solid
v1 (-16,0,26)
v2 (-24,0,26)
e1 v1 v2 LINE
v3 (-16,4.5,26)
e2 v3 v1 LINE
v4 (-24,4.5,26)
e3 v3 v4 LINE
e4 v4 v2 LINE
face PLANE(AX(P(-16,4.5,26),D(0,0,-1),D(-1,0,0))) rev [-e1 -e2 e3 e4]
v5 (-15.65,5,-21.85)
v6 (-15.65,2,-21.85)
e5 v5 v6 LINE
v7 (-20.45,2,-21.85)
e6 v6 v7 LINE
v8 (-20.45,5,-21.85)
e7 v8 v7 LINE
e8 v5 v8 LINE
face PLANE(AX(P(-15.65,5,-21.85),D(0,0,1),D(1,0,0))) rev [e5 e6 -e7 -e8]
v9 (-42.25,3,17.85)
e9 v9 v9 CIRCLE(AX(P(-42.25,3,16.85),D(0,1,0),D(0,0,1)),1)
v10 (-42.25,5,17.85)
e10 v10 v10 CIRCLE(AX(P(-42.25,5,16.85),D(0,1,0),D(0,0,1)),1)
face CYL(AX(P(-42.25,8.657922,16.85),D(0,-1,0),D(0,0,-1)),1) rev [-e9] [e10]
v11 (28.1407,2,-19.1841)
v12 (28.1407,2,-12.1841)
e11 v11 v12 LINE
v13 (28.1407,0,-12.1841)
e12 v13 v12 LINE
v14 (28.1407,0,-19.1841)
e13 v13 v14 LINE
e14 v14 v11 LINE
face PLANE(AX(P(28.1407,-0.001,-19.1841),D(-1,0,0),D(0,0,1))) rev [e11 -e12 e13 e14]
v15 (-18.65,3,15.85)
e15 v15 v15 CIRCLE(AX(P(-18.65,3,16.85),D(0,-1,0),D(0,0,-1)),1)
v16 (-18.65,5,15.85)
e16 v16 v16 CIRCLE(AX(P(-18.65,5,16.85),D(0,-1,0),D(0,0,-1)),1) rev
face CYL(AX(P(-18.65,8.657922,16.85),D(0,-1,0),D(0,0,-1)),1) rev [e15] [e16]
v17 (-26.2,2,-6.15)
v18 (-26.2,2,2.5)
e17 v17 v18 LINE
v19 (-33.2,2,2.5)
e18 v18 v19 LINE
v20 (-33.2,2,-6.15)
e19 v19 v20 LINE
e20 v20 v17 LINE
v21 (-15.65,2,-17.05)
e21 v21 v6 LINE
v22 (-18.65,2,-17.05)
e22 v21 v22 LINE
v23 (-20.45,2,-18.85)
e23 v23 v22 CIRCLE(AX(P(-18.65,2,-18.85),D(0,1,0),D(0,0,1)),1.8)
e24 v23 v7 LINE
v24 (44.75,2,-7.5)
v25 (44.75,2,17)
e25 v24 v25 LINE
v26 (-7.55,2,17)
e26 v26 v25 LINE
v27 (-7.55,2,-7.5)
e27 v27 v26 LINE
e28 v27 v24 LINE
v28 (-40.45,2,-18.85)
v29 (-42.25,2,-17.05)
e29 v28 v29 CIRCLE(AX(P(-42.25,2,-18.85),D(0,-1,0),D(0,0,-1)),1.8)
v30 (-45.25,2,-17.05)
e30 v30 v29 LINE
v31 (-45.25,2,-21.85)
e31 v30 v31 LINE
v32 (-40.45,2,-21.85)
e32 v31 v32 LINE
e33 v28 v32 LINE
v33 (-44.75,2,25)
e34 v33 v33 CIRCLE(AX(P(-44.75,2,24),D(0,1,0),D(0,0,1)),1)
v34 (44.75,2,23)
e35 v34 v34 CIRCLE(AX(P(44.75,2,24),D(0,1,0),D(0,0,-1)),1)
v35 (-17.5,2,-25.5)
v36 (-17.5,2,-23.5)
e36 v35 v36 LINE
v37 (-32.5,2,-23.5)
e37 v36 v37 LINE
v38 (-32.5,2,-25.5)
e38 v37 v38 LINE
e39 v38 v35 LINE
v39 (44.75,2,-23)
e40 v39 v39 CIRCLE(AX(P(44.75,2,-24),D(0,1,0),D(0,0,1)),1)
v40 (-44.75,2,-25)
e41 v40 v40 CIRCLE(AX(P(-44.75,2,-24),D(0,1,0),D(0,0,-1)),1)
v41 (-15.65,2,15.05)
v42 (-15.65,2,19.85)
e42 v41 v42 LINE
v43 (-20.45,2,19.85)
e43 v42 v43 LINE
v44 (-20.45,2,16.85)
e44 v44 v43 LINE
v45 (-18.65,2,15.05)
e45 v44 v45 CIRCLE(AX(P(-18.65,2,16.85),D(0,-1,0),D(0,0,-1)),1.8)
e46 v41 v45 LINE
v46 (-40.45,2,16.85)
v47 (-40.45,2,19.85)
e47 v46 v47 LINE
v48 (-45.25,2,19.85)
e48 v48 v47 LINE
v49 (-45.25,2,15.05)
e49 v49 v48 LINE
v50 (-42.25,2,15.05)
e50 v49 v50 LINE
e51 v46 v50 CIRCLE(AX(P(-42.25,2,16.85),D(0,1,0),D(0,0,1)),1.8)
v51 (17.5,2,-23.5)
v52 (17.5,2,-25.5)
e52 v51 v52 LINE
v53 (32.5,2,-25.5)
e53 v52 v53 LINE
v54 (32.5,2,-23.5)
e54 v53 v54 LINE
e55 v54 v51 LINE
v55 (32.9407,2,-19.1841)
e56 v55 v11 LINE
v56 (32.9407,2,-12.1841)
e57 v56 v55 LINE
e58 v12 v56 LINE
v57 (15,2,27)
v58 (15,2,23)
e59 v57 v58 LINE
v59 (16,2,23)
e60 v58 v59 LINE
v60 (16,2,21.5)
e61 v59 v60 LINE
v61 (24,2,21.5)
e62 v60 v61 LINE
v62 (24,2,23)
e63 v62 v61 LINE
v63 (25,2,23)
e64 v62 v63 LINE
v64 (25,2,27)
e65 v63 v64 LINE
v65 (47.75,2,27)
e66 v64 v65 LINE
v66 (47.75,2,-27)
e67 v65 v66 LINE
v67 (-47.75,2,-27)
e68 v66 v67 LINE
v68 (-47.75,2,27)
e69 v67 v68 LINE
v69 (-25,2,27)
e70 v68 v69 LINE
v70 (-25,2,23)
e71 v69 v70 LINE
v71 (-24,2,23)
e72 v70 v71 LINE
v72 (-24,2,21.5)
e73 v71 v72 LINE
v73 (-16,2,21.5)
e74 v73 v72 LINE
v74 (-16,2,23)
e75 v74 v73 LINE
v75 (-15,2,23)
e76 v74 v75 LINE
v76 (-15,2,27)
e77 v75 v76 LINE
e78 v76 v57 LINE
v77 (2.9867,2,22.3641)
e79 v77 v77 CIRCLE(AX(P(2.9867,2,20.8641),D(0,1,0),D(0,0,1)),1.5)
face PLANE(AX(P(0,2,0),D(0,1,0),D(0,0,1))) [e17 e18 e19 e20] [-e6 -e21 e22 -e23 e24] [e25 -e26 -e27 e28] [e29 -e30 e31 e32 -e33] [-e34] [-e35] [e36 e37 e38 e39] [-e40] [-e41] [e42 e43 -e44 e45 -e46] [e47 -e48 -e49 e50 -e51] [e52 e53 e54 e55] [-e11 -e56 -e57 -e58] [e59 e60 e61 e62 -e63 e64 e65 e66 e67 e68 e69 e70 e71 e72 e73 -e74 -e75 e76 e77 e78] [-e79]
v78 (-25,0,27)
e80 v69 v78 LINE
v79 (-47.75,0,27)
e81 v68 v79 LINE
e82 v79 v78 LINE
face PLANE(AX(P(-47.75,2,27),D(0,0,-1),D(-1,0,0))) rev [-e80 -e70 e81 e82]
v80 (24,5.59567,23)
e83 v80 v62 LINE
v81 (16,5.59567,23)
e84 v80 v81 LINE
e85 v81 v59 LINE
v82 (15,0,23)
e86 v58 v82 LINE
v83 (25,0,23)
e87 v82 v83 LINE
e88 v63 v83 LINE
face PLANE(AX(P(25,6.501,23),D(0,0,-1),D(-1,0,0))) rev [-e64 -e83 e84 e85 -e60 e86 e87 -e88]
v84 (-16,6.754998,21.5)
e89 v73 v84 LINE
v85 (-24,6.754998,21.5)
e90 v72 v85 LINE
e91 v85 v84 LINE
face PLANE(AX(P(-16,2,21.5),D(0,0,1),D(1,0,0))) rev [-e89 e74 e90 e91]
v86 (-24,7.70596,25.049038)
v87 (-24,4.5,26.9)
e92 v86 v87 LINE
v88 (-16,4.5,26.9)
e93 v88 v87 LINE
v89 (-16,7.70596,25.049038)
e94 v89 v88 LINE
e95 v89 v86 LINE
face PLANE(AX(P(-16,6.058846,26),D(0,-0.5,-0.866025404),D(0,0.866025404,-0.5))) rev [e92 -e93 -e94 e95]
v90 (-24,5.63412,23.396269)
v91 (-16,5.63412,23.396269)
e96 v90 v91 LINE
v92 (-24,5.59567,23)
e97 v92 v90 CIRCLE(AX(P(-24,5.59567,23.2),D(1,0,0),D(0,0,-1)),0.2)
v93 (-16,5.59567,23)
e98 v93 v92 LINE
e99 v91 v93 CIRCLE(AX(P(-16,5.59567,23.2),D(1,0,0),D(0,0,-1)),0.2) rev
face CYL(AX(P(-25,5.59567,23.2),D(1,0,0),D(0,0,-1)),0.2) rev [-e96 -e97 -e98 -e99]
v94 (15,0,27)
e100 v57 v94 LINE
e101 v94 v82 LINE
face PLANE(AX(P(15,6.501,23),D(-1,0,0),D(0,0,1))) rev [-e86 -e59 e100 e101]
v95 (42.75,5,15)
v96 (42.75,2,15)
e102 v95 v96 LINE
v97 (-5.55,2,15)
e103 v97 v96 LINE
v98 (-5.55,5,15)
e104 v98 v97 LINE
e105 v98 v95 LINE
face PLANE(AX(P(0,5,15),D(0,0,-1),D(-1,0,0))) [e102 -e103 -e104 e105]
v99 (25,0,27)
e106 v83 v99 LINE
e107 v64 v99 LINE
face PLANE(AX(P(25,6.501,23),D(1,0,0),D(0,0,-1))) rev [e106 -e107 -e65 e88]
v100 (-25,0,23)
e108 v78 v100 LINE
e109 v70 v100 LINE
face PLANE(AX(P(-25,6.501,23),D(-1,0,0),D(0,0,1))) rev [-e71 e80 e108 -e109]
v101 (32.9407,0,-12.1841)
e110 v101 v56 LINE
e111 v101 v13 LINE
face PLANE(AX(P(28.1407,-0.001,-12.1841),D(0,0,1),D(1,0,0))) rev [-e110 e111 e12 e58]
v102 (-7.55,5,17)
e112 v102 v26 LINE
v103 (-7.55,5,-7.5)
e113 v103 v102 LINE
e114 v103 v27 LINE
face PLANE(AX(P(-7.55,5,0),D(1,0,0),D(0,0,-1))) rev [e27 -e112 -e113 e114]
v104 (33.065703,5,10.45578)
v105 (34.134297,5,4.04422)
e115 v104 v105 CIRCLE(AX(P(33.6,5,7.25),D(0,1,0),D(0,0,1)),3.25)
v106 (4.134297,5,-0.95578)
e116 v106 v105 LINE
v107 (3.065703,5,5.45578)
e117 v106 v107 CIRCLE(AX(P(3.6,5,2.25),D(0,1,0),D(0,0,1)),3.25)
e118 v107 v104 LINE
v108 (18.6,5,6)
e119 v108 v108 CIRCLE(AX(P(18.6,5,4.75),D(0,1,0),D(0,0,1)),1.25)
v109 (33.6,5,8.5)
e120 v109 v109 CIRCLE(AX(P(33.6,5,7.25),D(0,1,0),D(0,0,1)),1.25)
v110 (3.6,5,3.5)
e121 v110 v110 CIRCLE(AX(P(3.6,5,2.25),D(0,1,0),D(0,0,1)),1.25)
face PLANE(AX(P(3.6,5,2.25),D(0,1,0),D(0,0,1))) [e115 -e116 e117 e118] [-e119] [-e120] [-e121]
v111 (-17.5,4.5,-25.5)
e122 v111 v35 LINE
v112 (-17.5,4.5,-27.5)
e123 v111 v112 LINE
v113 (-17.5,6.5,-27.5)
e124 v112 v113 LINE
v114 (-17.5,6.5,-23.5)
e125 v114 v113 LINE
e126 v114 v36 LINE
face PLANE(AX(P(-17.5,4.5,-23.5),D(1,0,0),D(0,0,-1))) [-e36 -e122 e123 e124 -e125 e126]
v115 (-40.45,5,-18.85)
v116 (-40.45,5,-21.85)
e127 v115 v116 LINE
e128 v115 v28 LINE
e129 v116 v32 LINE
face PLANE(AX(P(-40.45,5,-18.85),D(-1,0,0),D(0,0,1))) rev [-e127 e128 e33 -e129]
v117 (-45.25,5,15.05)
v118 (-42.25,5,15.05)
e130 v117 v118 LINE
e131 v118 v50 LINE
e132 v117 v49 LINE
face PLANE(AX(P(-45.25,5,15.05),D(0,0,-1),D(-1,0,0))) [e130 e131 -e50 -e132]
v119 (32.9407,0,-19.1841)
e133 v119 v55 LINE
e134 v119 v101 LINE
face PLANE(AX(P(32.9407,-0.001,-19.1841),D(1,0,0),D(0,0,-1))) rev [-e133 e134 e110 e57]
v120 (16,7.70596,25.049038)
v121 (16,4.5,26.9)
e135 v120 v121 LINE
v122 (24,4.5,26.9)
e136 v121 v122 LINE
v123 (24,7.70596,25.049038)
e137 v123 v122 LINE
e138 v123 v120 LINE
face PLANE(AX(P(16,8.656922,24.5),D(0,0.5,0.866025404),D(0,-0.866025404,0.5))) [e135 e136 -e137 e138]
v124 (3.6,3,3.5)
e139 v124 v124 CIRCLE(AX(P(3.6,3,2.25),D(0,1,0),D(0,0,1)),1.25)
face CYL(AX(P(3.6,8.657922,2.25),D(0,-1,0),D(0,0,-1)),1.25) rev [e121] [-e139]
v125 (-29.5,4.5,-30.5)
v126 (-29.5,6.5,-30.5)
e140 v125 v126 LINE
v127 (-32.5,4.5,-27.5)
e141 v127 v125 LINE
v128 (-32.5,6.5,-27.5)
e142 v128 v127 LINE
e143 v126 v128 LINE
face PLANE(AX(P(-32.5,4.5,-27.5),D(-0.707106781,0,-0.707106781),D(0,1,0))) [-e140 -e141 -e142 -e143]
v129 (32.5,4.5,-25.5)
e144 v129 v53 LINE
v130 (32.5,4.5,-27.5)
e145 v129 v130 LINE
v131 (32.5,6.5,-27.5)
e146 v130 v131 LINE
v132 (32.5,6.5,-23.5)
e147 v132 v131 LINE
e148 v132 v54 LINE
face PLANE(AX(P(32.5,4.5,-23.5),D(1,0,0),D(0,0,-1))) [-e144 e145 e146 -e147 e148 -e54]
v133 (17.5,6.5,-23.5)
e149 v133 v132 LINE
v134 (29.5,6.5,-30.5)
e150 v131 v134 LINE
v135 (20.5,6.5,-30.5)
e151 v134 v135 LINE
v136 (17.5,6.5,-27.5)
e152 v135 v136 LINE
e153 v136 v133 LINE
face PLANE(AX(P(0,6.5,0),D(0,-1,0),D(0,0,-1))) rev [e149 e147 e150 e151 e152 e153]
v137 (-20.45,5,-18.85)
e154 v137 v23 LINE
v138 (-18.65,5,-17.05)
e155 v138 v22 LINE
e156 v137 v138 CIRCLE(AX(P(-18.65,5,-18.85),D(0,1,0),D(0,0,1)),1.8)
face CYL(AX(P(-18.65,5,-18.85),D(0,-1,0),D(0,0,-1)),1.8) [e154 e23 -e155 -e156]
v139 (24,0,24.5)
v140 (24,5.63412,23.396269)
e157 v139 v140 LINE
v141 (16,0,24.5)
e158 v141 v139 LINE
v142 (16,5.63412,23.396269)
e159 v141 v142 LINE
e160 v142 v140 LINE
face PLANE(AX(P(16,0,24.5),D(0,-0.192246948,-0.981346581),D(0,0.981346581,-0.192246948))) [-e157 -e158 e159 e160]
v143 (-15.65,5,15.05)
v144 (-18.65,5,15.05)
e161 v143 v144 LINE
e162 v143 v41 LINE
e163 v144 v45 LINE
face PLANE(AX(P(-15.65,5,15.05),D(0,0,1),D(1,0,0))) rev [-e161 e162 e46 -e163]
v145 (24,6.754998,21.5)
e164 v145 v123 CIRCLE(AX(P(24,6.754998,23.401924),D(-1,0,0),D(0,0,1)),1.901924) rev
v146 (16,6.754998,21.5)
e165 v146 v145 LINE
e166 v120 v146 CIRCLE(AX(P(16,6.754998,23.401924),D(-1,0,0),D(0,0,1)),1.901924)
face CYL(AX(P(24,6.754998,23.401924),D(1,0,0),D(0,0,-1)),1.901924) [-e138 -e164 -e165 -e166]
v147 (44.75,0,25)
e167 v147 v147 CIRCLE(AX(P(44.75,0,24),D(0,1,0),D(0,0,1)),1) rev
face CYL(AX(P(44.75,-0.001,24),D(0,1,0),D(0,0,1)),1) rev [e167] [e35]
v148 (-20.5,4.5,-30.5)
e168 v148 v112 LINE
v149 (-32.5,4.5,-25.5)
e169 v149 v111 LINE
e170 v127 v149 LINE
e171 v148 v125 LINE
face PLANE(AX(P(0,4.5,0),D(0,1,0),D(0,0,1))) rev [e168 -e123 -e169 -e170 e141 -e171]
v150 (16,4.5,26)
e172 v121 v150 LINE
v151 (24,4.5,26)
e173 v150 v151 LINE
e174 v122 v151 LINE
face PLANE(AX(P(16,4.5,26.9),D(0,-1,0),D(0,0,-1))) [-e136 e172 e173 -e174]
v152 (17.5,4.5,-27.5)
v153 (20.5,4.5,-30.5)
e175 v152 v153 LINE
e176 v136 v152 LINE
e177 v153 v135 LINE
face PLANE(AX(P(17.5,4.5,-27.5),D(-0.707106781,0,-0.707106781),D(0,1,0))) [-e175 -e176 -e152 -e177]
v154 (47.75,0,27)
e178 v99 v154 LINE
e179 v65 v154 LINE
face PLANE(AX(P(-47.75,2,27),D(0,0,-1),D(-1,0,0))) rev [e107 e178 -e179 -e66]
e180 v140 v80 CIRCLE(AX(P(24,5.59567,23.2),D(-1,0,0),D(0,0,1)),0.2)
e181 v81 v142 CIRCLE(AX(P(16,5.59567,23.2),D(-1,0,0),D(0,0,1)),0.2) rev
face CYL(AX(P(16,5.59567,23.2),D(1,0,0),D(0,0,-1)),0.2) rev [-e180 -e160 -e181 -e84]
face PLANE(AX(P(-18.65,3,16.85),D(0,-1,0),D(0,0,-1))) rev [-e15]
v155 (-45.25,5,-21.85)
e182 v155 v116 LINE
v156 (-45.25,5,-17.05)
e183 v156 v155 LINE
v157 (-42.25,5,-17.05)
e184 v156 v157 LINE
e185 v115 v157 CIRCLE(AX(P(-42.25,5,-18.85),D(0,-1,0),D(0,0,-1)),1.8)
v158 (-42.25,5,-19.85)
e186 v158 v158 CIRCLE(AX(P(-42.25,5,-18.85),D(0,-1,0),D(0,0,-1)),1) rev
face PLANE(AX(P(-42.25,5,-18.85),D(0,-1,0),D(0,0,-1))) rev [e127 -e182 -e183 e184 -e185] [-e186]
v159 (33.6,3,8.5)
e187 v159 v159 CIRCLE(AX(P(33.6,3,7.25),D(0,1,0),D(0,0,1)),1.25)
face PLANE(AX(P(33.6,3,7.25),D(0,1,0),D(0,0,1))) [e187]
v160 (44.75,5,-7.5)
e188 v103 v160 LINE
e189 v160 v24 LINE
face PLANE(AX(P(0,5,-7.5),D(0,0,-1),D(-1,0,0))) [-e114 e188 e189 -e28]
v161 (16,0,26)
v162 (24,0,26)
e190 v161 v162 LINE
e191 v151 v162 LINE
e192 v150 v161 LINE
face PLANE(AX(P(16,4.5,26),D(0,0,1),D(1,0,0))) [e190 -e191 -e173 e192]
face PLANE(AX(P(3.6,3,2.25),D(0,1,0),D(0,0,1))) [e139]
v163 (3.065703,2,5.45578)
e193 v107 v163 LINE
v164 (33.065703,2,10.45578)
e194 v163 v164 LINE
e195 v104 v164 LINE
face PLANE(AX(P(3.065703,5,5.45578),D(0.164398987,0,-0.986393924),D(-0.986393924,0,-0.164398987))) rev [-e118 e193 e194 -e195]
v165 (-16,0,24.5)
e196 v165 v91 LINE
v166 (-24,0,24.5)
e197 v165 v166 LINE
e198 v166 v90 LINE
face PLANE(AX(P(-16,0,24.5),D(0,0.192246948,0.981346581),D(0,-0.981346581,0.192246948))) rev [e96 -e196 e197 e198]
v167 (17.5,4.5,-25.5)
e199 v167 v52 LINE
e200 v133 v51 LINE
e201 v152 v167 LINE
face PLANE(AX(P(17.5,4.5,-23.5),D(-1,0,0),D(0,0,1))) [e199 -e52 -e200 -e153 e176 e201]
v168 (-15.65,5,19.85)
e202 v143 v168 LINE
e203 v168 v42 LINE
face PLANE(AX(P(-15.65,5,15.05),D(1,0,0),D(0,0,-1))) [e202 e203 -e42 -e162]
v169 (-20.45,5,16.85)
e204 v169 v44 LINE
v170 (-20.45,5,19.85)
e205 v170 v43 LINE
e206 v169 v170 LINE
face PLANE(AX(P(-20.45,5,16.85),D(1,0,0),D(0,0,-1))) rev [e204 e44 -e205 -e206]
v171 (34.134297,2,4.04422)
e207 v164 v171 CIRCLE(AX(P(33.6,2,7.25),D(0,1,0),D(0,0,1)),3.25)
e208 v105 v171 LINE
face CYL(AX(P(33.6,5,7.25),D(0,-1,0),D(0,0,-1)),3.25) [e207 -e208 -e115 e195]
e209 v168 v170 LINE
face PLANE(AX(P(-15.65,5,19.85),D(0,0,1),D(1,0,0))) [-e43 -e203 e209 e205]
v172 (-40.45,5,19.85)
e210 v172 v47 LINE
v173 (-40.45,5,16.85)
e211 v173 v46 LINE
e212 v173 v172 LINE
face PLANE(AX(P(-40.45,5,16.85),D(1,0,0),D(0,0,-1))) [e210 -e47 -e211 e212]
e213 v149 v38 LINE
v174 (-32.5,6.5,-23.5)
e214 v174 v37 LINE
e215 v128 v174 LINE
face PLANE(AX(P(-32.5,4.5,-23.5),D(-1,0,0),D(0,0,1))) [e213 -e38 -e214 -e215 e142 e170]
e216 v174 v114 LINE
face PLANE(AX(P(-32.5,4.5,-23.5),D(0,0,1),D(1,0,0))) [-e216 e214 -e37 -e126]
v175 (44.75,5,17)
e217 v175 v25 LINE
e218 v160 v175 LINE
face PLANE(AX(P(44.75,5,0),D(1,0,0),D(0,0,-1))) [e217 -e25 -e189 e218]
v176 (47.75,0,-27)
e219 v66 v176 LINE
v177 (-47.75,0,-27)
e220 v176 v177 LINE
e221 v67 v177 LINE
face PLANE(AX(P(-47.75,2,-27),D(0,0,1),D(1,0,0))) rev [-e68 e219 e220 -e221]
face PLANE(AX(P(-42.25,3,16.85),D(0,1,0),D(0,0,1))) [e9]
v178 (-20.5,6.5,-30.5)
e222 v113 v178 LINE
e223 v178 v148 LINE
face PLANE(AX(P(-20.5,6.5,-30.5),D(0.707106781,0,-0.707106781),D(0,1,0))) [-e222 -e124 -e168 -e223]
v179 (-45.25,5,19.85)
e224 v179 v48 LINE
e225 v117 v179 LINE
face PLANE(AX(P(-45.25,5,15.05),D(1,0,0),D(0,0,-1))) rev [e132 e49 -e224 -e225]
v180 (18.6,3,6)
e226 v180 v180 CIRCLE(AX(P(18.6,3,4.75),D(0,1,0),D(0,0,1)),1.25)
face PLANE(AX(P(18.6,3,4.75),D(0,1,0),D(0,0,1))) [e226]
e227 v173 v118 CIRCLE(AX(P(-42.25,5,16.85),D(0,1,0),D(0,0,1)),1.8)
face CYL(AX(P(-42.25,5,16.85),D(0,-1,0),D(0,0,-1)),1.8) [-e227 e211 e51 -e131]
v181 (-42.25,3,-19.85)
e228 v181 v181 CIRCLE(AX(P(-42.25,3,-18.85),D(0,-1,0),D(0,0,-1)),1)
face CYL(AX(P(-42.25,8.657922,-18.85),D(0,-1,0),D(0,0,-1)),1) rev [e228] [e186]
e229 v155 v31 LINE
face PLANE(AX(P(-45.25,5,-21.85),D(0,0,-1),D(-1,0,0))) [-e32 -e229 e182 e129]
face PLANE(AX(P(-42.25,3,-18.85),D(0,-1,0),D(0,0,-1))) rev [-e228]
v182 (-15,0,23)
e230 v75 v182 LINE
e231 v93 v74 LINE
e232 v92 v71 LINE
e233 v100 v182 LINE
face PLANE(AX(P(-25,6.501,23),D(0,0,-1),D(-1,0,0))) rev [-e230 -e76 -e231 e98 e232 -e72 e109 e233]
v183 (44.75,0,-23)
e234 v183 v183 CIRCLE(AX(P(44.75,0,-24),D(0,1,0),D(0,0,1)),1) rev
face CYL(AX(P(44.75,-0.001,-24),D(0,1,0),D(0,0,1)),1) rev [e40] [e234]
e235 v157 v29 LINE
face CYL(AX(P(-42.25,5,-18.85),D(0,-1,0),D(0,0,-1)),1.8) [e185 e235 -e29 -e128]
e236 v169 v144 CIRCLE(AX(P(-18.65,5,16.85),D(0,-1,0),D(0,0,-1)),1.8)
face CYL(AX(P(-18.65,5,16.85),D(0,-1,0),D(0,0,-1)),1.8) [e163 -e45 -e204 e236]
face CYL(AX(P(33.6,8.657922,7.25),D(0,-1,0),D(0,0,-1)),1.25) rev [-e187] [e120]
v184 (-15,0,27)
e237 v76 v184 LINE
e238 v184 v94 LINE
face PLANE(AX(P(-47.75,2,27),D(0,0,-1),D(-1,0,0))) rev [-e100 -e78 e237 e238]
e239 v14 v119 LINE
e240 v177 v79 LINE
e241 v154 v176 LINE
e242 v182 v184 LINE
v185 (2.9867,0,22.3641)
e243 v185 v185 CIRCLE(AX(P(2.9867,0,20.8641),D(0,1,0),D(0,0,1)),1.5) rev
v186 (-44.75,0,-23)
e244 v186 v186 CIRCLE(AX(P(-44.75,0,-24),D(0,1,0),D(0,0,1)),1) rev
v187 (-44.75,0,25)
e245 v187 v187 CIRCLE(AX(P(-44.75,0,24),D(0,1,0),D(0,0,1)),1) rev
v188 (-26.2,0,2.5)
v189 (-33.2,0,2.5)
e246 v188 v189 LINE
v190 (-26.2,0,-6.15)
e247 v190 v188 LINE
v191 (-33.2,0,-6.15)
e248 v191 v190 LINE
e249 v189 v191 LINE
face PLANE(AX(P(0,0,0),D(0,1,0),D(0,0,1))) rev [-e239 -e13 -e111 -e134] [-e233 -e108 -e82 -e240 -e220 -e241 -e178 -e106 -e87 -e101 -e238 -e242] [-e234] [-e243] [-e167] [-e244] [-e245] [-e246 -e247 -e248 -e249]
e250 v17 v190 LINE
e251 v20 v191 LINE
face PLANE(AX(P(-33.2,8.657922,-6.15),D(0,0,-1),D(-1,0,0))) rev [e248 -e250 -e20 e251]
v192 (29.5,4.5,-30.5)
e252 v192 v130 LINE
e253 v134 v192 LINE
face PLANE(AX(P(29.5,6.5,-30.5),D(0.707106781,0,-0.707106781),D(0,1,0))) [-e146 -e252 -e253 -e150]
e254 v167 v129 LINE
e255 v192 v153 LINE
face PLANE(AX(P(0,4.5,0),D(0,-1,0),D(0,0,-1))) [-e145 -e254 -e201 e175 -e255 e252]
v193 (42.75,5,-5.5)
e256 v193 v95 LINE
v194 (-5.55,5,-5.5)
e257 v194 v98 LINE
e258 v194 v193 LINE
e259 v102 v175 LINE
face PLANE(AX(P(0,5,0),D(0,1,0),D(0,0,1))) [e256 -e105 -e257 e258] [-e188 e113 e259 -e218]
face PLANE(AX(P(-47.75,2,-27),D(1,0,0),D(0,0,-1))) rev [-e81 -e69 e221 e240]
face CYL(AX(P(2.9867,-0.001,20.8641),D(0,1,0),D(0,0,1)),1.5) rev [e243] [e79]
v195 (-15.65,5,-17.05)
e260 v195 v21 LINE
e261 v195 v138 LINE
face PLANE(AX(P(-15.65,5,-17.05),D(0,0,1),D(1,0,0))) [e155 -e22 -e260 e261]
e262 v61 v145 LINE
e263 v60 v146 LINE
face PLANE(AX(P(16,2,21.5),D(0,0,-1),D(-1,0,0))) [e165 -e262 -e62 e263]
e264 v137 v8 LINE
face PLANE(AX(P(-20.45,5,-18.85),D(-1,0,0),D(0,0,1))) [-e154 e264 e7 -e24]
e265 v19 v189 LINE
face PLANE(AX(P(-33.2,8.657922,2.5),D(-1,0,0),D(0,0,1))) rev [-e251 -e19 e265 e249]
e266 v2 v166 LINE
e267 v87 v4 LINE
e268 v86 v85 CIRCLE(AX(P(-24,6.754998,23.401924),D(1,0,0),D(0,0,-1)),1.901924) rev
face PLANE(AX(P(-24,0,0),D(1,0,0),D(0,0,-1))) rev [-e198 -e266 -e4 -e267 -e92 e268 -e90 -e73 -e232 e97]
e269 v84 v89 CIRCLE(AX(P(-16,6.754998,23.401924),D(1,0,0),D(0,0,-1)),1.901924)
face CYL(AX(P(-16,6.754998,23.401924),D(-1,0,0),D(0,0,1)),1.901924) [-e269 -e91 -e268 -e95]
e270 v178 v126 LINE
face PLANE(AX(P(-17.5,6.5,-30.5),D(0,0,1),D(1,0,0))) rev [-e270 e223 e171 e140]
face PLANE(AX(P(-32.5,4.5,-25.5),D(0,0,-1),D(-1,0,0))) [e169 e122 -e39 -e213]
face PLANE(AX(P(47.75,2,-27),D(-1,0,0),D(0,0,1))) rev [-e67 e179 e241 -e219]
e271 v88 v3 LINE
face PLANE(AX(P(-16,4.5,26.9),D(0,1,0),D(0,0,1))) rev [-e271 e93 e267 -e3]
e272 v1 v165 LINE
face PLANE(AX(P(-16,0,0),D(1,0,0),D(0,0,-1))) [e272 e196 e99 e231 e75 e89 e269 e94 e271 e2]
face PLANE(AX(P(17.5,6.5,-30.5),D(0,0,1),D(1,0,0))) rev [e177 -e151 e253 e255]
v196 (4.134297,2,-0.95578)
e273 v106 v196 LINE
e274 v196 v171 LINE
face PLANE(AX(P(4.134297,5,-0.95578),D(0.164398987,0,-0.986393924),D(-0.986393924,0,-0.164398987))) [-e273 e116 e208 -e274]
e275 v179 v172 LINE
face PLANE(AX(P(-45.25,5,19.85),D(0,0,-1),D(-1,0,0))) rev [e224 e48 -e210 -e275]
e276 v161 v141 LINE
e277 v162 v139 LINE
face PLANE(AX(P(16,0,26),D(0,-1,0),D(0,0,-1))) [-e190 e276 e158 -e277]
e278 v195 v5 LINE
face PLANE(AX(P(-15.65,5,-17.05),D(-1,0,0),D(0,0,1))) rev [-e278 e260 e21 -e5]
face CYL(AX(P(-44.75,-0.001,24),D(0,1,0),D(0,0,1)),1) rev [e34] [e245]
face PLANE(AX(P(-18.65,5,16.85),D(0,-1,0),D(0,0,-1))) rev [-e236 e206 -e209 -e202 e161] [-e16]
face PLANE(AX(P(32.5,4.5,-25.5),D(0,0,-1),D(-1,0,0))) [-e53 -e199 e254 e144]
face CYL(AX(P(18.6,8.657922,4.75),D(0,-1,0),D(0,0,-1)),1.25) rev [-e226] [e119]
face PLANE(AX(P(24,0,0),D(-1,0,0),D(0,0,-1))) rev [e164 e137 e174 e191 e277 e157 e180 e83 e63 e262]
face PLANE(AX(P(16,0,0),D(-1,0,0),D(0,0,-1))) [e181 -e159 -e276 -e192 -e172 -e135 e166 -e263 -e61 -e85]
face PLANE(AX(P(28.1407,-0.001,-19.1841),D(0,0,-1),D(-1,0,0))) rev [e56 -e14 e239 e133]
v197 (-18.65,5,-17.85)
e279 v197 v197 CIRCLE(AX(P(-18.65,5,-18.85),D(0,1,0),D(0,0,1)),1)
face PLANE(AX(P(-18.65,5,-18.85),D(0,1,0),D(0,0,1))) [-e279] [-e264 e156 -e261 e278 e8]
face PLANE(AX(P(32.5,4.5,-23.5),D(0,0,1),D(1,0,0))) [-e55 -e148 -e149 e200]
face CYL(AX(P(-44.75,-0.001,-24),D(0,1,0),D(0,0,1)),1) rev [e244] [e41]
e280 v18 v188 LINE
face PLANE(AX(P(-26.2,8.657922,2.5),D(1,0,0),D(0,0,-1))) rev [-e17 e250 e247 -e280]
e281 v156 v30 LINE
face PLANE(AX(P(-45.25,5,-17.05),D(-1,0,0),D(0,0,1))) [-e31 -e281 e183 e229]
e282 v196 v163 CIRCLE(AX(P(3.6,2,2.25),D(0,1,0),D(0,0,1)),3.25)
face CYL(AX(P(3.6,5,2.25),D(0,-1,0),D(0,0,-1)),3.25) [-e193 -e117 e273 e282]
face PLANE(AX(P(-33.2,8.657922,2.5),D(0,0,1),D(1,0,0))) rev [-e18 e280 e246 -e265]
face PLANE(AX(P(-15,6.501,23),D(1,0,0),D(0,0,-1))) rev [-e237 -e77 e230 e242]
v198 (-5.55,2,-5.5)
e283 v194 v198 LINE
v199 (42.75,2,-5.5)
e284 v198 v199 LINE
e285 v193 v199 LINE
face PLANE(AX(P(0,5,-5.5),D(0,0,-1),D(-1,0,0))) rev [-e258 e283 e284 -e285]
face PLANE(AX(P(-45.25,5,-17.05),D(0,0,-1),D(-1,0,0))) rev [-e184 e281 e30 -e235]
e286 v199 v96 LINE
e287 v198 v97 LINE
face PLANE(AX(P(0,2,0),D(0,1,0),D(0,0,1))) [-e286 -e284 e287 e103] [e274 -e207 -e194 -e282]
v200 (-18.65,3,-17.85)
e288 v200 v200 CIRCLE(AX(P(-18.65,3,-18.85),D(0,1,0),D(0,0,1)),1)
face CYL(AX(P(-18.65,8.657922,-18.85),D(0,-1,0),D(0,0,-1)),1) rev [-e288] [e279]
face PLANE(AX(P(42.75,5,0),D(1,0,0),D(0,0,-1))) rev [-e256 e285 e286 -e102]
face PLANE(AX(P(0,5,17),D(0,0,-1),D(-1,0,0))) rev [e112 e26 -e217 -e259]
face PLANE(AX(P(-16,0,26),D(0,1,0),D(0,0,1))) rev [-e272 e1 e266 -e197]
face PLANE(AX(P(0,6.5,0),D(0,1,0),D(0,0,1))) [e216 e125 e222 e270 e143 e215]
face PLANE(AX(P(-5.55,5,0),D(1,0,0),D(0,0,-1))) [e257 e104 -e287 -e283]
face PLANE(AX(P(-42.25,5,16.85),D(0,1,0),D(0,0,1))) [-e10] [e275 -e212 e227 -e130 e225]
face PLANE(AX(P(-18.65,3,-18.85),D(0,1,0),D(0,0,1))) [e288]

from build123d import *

# Parameters (mm, degrees)
SKETCH1_W            = 95.5
SKETCH1_H            = 54
BOSS_EXTRUDE1_DEPTH  = 2
SKETCH2_W            = 15
SKETCH2_H            = 2
BOSS_EXTRUDE2_DEPTH  = 2.5
SKETCH3_W            = 15
SKETCH3_H            = 7
BOSS_EXTRUDE3_DEPTH  = 2
CHAMFER1_SIZE        = 3
CUT_EXTRUDE1_REACH   = 59.031
SKETCH4_W            = 10
SKETCH4_H            = 4
BOSS_EXTRUDE4_DEPTH  = 4
FILLET1_R            = 1.901924
FILLET2_R            = 0.2
FILLET1_OF_MIRROR1_R = 1.901924
FILLET2_OF_MIRROR1_R = 0.2
CUT_EXTRUDE5_REACH   = 59.049
SKETCH12_R           = 1.5
SKETCH12_R_2         = 1
CUT_EXTRUDE6_REACH   = 59.049
SKETCH13_W           = 4.8
SKETCH13_H           = 7
CUT_EXTRUDE2_REACH   = 59.317
SKETCH8_W            = 7
SKETCH8_H            = 8.65
BOSS_EXTRUDE5_DEPTH  = 3
CUT_EXTRUDE3_REACH   = 60.049
CUT_EXTRUDE3_START   = 1
SKETCH9_3_R          = 1
SKETCH10_W           = 52.3
SKETCH10_H           = 24.5
SKETCH10_W_2         = 48.3
SKETCH10_H_2         = 20.5
BOSS_EXTRUDE6_DEPTH  = 3
CUT_EXTRUDE4_REACH   = 60.049
CUT_EXTRUDE4_START   = 1
SKETCH10_4_R         = 1.25


with BuildPart() as part:
    # Sketch1 → Boss-Extrude1 (new body)
    with BuildSketch(Plane(origin=(0, 0, 0), x_dir=(1, 0, 0), z_dir=(0, 1, 0))):
        Rectangle(SKETCH1_W, SKETCH1_H)
    extrude(amount=BOSS_EXTRUDE1_DEPTH)

    # Sketch2 → Boss-Extrude2 (add)
    with BuildSketch(Plane.XZ.offset(-2)):
        with Locations((-25, -24.5)):
            Rectangle(SKETCH2_W, SKETCH2_H)
        with Locations((25, -24.5)):
            Rectangle(SKETCH2_W, SKETCH2_H)
    extrude(amount=-BOSS_EXTRUDE2_DEPTH)

    # Sketch3 → Boss-Extrude3 (add)
    with BuildSketch(Plane(origin=(0, 4.5, 0), x_dir=(-1, 0, 0), z_dir=(0, 1, 0))):
        with Locations((-25, -27)):
            Rectangle(SKETCH3_W, SKETCH3_H)
        with Locations((25, -27)):
            Rectangle(SKETCH3_W, SKETCH3_H)
    extrude(amount=BOSS_EXTRUDE3_DEPTH)

    # Chamfer1
    chamfer1_edges = [part.edges().sort_by_distance(p)[0] for p in [
        (32.5, 5.5, -30.5),
        (17.5, 5.5, -30.5),
        (-17.5, 5.5, -30.5),
        (-32.5, 5.5, -30.5),
    ]]
    chamfer(chamfer1_edges, length=CHAMFER1_SIZE)

    # Sketch4 → Cut-Extrude1 (cut, up to next)
    with BuildSketch(Plane.XZ, mode=Mode.PRIVATE) as cut_extrude1_sk1:
        with Locations((-20, 25)):
            Rectangle(SKETCH4_W, SKETCH4_H)
    cut_extrude1_tool1 = extrude(cut_extrude1_sk1.sketch, amount=-CUT_EXTRUDE1_REACH, mode=Mode.PRIVATE) & part.part
    # Sketch4 → Cut-Extrude1 (cut, up to next)
    with BuildSketch(Plane.XZ, mode=Mode.PRIVATE) as cut_extrude1_sk2:
        with Locations((20, 25)):
            Rectangle(SKETCH4_W, SKETCH4_H)
    cut_extrude1_tool2 = extrude(cut_extrude1_sk2.sketch, amount=-CUT_EXTRUDE1_REACH, mode=Mode.PRIVATE) & part.part
    add(cut_extrude1_tool1.solids().sort_by_distance((-20, 0, 25))[0], mode=Mode.SUBTRACT)
    add(cut_extrude1_tool2.solids().sort_by_distance((20, 0, 25))[0], mode=Mode.SUBTRACT)

    # Sketch6 → Boss-Extrude4 (add, symmetric)
    with BuildSketch(Plane(origin=(-20, 0, 0), x_dir=(0, 0, -1), z_dir=(1, 0, 0))):
        Polygon((-21.5, 2), (-21.5, 8.656921938), (-24.5, 8.656921938), (-26, 6.058845727), (-26.9, 4.5), (-26, 4.5), (-26, 0), (-24.5, 0), (-23, 7.656921938), (-23, 2), align=None)
    boss_extrude4 = extrude(amount=BOSS_EXTRUDE4_DEPTH, both=True)

    # Fillet1
    fillet1_edges = [part.edges().sort_by_distance(p)[0] for p in [
        (-20, 8.656921938, 21.5),
        (-20, 8.656921938, 24.5),
    ]]
    fillet(fillet1_edges, radius=FILLET1_R - 0.0001)  # a hair under: the kernel refuses the full size

    # Fillet2
    fillet2_edges = [part.edges().sort_by_distance(p)[0] for p in [
        (-20, 7.656921938, 23),
    ]]
    fillet(fillet2_edges, radius=FILLET2_R)

    # Mirror1: Boss-Extrude4 across plane
    add(boss_extrude4.mirror(Plane(origin=(0, 0, 0), x_dir=(0, 0, 1), z_dir=(1, 0, 0))))

    # Fillet1 of Mirror1
    fillet1_of_mirror1_edges = [part.edges().sort_by_distance(p)[0] for p in [
        (20, 8.656921938, 21.5),
        (20, 8.656921938, 24.5),
    ]]
    fillet(fillet1_of_mirror1_edges, radius=FILLET1_OF_MIRROR1_R - 0.0001)  # a hair under: the kernel refuses the full size

    # Fillet2 of Mirror1
    fillet2_of_mirror1_edges = [part.edges().sort_by_distance(p)[0] for p in [
        (20, 7.656921938, 23),
    ]]
    fillet(fillet2_of_mirror1_edges, radius=FILLET2_OF_MIRROR1_R)

    # Sketch12 → Cut-Extrude5 (cut, up to next)
    with BuildSketch(Plane(origin=(0, 2, 0), x_dir=(1, 0, 0), z_dir=(0, 1, 0)), mode=Mode.PRIVATE) as cut_extrude5_sk1:
        with Locations(Location((2.9867, -20.8641, 0), (0, 0, 270))):
            Circle(SKETCH12_R)
    cut_extrude5_tool1 = extrude(cut_extrude5_sk1.sketch, amount=-CUT_EXTRUDE5_REACH, mode=Mode.PRIVATE) & part.part
    # Sketch12 → Cut-Extrude5 (cut, up to next)
    with BuildSketch(Plane(origin=(0, 2, 0), x_dir=(1, 0, 0), z_dir=(0, 1, 0)), mode=Mode.PRIVATE) as cut_extrude5_sk2:
        with Locations(Location((-44.75, -24, 0), (0, 0, 270))):
            Circle(SKETCH12_R_2)
    cut_extrude5_tool2 = extrude(cut_extrude5_sk2.sketch, amount=-CUT_EXTRUDE5_REACH, mode=Mode.PRIVATE) & part.part
    # Sketch12 → Cut-Extrude5 (cut, up to next)
    with BuildSketch(Plane(origin=(0, 2, 0), x_dir=(1, 0, 0), z_dir=(0, 1, 0)), mode=Mode.PRIVATE) as cut_extrude5_sk3:
        with Locations(Location((44.75, -24, 0), (0, 0, 270))):
            Circle(SKETCH12_R_2)
    cut_extrude5_tool3 = extrude(cut_extrude5_sk3.sketch, amount=-CUT_EXTRUDE5_REACH, mode=Mode.PRIVATE) & part.part
    # Sketch12 → Cut-Extrude5 (cut, up to next)
    with BuildSketch(Plane(origin=(0, 2, 0), x_dir=(1, 0, 0), z_dir=(0, 1, 0)), mode=Mode.PRIVATE) as cut_extrude5_sk4:
        with Locations(Location((-44.75, 24, 0), (0, 0, 270))):
            Circle(SKETCH12_R_2)
    cut_extrude5_tool4 = extrude(cut_extrude5_sk4.sketch, amount=-CUT_EXTRUDE5_REACH, mode=Mode.PRIVATE) & part.part
    # Sketch12 → Cut-Extrude5 (cut, up to next)
    with BuildSketch(Plane(origin=(0, 2, 0), x_dir=(1, 0, 0), z_dir=(0, 1, 0)), mode=Mode.PRIVATE) as cut_extrude5_sk5:
        with Locations(Location((44.75, 24, 0), (0, 0, 270))):
            Circle(SKETCH12_R_2)
    cut_extrude5_tool5 = extrude(cut_extrude5_sk5.sketch, amount=-CUT_EXTRUDE5_REACH, mode=Mode.PRIVATE) & part.part
    add(cut_extrude5_tool1.solids().sort_by_distance((2.9867, 2, 20.8641))[0], mode=Mode.SUBTRACT)
    add(cut_extrude5_tool2.solids().sort_by_distance((-44.75, 2, 24))[0], mode=Mode.SUBTRACT)
    add(cut_extrude5_tool3.solids().sort_by_distance((44.75, 2, 24))[0], mode=Mode.SUBTRACT)
    add(cut_extrude5_tool4.solids().sort_by_distance((-44.75, 2, -24))[0], mode=Mode.SUBTRACT)
    add(cut_extrude5_tool5.solids().sort_by_distance((44.75, 2, -24))[0], mode=Mode.SUBTRACT)

    # Sketch13 → Cut-Extrude6 (cut, up to next)
    with BuildSketch(Plane(origin=(0, 2, 0), x_dir=(1, 0, 0), z_dir=(0, 1, 0)), mode=Mode.PRIVATE) as cut_extrude6_sk1:
        with Locations((30.5407, 15.6841)):
            Rectangle(SKETCH13_W, SKETCH13_H)
    cut_extrude6_tool1 = extrude(cut_extrude6_sk1.sketch, amount=-CUT_EXTRUDE6_REACH, mode=Mode.PRIVATE) & part.part
    add(cut_extrude6_tool1.solids().sort_by_distance((30.5407, 2, -15.6841))[0], mode=Mode.SUBTRACT)

    # Sketch8 → Cut-Extrude2 (cut, up to next)
    with BuildSketch(Plane.XZ, mode=Mode.PRIVATE) as cut_extrude2_sk1:
        with Locations((-29.7, -1.825)):
            Rectangle(SKETCH8_W, SKETCH8_H)
    cut_extrude2_tool1 = extrude(cut_extrude2_sk1.sketch, amount=-CUT_EXTRUDE2_REACH, mode=Mode.PRIVATE) & part.part
    add(cut_extrude2_tool1.solids().sort_by_distance((-29.7, 0, -1.825))[0], mode=Mode.SUBTRACT)

    # Sketch9 → Boss-Extrude5 (add)
    with BuildSketch(Plane(origin=(0, 2, 0), x_dir=(1, 0, 0), z_dir=(0, 1, 0))):
        with BuildLine():
            Line((-45.25, -15.05), (-45.25, -19.85))
            Line((-45.25, -19.85), (-40.45, -19.85))
            Line((-40.45, -19.85), (-40.45, -16.85))
            ThreePointArc((-40.45, -16.85), (-40.977207794, -15.577207794), (-42.25, -15.05))
            Line((-42.25, -15.05), (-45.25, -15.05))
        make_face()
        with BuildLine():
            Line((-15.65, -15.05), (-18.65, -15.05))
            ThreePointArc((-18.65, -15.05), (-19.922792206, -15.577207794), (-20.45, -16.85))
            Line((-20.45, -16.85), (-20.45, -19.85))
            Line((-20.45, -19.85), (-15.65, -19.85))
            Line((-15.65, -19.85), (-15.65, -15.05))
        make_face()
        with BuildLine():
            Line((-45.25, 17.05), (-42.25, 17.05))
            ThreePointArc((-42.25, 17.05), (-40.977207794, 17.577207794), (-40.45, 18.85))
            Line((-40.45, 18.85), (-40.45, 21.85))
            Line((-40.45, 21.85), (-45.25, 21.85))
            Line((-45.25, 21.85), (-45.25, 17.05))
        make_face()
        with BuildLine():
            Line((-15.65, 17.05), (-15.65, 21.85))
            Line((-15.65, 21.85), (-20.45, 21.85))
            Line((-20.45, 21.85), (-20.45, 18.85))
            ThreePointArc((-20.45, 18.85), (-19.922792206, 17.577207794), (-18.65, 17.05))
            Line((-18.65, 17.05), (-15.65, 17.05))
        make_face()
    extrude(amount=BOSS_EXTRUDE5_DEPTH)

    # Sketch9<3> → Cut-Extrude3 (cut, up to next)
    with BuildSketch(Plane(origin=(0, 2, 0), x_dir=(1, 0, 0), z_dir=(0, 1, 0)).offset(CUT_EXTRUDE3_START), mode=Mode.PRIVATE) as cut_extrude3_sk1:
        with Locations(Location((-42.25, -16.85, 0), (0, 0, 270))):
            Circle(SKETCH9_3_R)
    cut_extrude3_tool1 = extrude(cut_extrude3_sk1.sketch, amount=CUT_EXTRUDE3_REACH, mode=Mode.PRIVATE) & part.part
    # Sketch9<3> → Cut-Extrude3 (cut, up to next)
    with BuildSketch(Plane(origin=(0, 2, 0), x_dir=(1, 0, 0), z_dir=(0, 1, 0)).offset(CUT_EXTRUDE3_START), mode=Mode.PRIVATE) as cut_extrude3_sk2:
        with Locations(Location((-18.65, -16.85, 0), (0, 0, 90))):
            Circle(SKETCH9_3_R)
    cut_extrude3_tool2 = extrude(cut_extrude3_sk2.sketch, amount=CUT_EXTRUDE3_REACH, mode=Mode.PRIVATE) & part.part
    # Sketch9<3> → Cut-Extrude3 (cut, up to next)
    with BuildSketch(Plane(origin=(0, 2, 0), x_dir=(1, 0, 0), z_dir=(0, 1, 0)).offset(CUT_EXTRUDE3_START), mode=Mode.PRIVATE) as cut_extrude3_sk3:
        with Locations(Location((-42.25, 18.85, 0), (0, 0, 90))):
            Circle(SKETCH9_3_R)
    cut_extrude3_tool3 = extrude(cut_extrude3_sk3.sketch, amount=CUT_EXTRUDE3_REACH, mode=Mode.PRIVATE) & part.part
    # Sketch9<3> → Cut-Extrude3 (cut, up to next)
    with BuildSketch(Plane(origin=(0, 2, 0), x_dir=(1, 0, 0), z_dir=(0, 1, 0)).offset(CUT_EXTRUDE3_START), mode=Mode.PRIVATE) as cut_extrude3_sk4:
        with Locations(Location((-18.65, 18.85, 0), (0, 0, 270))):
            Circle(SKETCH9_3_R)
    cut_extrude3_tool4 = extrude(cut_extrude3_sk4.sketch, amount=CUT_EXTRUDE3_REACH, mode=Mode.PRIVATE) & part.part
    add(cut_extrude3_tool1.solids().sort_by_distance((-42.25, 3, 16.85))[0], mode=Mode.SUBTRACT)
    add(cut_extrude3_tool2.solids().sort_by_distance((-18.65, 3, 16.85))[0], mode=Mode.SUBTRACT)
    add(cut_extrude3_tool3.solids().sort_by_distance((-42.25, 3, -18.85))[0], mode=Mode.SUBTRACT)
    add(cut_extrude3_tool4.solids().sort_by_distance((-18.65, 3, -18.85))[0], mode=Mode.SUBTRACT)

    # Sketch10 → Boss-Extrude6 (add)
    # profile 1 of 2: a face of its own
    with BuildSketch(Plane(origin=(0, 2, 0), x_dir=(1, 0, 0), z_dir=(0, 1, 0))):
        with Locations((18.6, -4.75)):
            Rectangle(SKETCH10_W, SKETCH10_H)
        with Locations((18.6, -4.75)):
            Rectangle(SKETCH10_W_2, SKETCH10_H_2, mode=Mode.SUBTRACT)
    # profile 2 of 2: a face of its own
    with BuildSketch(Plane(origin=(0, 2, 0), x_dir=(1, 0, 0), z_dir=(0, 1, 0))):
        with BuildLine():
            Line((4.134296709, 0.955780252), (34.134296709, -4.044219748))
            ThreePointArc((34.134296709, -4.044219748), (36.805780252, -7.784296709), (33.065703291, -10.455780252))
            Line((33.065703291, -10.455780252), (3.065703291, -5.455780252))
            ThreePointArc((3.065703291, -5.455780252), (0.394219748, -1.715703291), (4.134296709, 0.955780252))
        make_face()
    extrude(amount=BOSS_EXTRUDE6_DEPTH)

    # Sketch10<4> → Cut-Extrude4 (cut, up to next)
    with BuildSketch(Plane(origin=(0, 2, 0), x_dir=(1, 0, 0), z_dir=(0, 1, 0)).offset(CUT_EXTRUDE4_START), mode=Mode.PRIVATE) as cut_extrude4_sk1:
        with Locations(Location((18.6, -4.75, 0), (0, 0, 270))):
            Circle(SKETCH10_4_R)
    cut_extrude4_tool1 = extrude(cut_extrude4_sk1.sketch, amount=CUT_EXTRUDE4_REACH, mode=Mode.PRIVATE) & part.part
    # Sketch10<4> → Cut-Extrude4 (cut, up to next)
    with BuildSketch(Plane(origin=(0, 2, 0), x_dir=(1, 0, 0), z_dir=(0, 1, 0)).offset(CUT_EXTRUDE4_START), mode=Mode.PRIVATE) as cut_extrude4_sk2:
        with Locations(Location((3.6, -2.25, 0), (0, 0, 270))):
            Circle(SKETCH10_4_R)
    cut_extrude4_tool2 = extrude(cut_extrude4_sk2.sketch, amount=CUT_EXTRUDE4_REACH, mode=Mode.PRIVATE) & part.part
    # Sketch10<4> → Cut-Extrude4 (cut, up to next)
    with BuildSketch(Plane(origin=(0, 2, 0), x_dir=(1, 0, 0), z_dir=(0, 1, 0)).offset(CUT_EXTRUDE4_START), mode=Mode.PRIVATE) as cut_extrude4_sk3:
        with Locations(Location((33.6, -7.25, 0), (0, 0, 270))):
            Circle(SKETCH10_4_R)
    cut_extrude4_tool3 = extrude(cut_extrude4_sk3.sketch, amount=CUT_EXTRUDE4_REACH, mode=Mode.PRIVATE) & part.part
    add(cut_extrude4_tool1.solids().sort_by_distance((18.6, 3, 4.75))[0], mode=Mode.SUBTRACT)
    add(cut_extrude4_tool2.solids().sort_by_distance((3.6, 3, 2.25))[0], mode=Mode.SUBTRACT)
    add(cut_extrude4_tool3.solids().sort_by_distance((33.6, 3, 7.25))[0], mode=Mode.SUBTRACT)


solid = part.part
